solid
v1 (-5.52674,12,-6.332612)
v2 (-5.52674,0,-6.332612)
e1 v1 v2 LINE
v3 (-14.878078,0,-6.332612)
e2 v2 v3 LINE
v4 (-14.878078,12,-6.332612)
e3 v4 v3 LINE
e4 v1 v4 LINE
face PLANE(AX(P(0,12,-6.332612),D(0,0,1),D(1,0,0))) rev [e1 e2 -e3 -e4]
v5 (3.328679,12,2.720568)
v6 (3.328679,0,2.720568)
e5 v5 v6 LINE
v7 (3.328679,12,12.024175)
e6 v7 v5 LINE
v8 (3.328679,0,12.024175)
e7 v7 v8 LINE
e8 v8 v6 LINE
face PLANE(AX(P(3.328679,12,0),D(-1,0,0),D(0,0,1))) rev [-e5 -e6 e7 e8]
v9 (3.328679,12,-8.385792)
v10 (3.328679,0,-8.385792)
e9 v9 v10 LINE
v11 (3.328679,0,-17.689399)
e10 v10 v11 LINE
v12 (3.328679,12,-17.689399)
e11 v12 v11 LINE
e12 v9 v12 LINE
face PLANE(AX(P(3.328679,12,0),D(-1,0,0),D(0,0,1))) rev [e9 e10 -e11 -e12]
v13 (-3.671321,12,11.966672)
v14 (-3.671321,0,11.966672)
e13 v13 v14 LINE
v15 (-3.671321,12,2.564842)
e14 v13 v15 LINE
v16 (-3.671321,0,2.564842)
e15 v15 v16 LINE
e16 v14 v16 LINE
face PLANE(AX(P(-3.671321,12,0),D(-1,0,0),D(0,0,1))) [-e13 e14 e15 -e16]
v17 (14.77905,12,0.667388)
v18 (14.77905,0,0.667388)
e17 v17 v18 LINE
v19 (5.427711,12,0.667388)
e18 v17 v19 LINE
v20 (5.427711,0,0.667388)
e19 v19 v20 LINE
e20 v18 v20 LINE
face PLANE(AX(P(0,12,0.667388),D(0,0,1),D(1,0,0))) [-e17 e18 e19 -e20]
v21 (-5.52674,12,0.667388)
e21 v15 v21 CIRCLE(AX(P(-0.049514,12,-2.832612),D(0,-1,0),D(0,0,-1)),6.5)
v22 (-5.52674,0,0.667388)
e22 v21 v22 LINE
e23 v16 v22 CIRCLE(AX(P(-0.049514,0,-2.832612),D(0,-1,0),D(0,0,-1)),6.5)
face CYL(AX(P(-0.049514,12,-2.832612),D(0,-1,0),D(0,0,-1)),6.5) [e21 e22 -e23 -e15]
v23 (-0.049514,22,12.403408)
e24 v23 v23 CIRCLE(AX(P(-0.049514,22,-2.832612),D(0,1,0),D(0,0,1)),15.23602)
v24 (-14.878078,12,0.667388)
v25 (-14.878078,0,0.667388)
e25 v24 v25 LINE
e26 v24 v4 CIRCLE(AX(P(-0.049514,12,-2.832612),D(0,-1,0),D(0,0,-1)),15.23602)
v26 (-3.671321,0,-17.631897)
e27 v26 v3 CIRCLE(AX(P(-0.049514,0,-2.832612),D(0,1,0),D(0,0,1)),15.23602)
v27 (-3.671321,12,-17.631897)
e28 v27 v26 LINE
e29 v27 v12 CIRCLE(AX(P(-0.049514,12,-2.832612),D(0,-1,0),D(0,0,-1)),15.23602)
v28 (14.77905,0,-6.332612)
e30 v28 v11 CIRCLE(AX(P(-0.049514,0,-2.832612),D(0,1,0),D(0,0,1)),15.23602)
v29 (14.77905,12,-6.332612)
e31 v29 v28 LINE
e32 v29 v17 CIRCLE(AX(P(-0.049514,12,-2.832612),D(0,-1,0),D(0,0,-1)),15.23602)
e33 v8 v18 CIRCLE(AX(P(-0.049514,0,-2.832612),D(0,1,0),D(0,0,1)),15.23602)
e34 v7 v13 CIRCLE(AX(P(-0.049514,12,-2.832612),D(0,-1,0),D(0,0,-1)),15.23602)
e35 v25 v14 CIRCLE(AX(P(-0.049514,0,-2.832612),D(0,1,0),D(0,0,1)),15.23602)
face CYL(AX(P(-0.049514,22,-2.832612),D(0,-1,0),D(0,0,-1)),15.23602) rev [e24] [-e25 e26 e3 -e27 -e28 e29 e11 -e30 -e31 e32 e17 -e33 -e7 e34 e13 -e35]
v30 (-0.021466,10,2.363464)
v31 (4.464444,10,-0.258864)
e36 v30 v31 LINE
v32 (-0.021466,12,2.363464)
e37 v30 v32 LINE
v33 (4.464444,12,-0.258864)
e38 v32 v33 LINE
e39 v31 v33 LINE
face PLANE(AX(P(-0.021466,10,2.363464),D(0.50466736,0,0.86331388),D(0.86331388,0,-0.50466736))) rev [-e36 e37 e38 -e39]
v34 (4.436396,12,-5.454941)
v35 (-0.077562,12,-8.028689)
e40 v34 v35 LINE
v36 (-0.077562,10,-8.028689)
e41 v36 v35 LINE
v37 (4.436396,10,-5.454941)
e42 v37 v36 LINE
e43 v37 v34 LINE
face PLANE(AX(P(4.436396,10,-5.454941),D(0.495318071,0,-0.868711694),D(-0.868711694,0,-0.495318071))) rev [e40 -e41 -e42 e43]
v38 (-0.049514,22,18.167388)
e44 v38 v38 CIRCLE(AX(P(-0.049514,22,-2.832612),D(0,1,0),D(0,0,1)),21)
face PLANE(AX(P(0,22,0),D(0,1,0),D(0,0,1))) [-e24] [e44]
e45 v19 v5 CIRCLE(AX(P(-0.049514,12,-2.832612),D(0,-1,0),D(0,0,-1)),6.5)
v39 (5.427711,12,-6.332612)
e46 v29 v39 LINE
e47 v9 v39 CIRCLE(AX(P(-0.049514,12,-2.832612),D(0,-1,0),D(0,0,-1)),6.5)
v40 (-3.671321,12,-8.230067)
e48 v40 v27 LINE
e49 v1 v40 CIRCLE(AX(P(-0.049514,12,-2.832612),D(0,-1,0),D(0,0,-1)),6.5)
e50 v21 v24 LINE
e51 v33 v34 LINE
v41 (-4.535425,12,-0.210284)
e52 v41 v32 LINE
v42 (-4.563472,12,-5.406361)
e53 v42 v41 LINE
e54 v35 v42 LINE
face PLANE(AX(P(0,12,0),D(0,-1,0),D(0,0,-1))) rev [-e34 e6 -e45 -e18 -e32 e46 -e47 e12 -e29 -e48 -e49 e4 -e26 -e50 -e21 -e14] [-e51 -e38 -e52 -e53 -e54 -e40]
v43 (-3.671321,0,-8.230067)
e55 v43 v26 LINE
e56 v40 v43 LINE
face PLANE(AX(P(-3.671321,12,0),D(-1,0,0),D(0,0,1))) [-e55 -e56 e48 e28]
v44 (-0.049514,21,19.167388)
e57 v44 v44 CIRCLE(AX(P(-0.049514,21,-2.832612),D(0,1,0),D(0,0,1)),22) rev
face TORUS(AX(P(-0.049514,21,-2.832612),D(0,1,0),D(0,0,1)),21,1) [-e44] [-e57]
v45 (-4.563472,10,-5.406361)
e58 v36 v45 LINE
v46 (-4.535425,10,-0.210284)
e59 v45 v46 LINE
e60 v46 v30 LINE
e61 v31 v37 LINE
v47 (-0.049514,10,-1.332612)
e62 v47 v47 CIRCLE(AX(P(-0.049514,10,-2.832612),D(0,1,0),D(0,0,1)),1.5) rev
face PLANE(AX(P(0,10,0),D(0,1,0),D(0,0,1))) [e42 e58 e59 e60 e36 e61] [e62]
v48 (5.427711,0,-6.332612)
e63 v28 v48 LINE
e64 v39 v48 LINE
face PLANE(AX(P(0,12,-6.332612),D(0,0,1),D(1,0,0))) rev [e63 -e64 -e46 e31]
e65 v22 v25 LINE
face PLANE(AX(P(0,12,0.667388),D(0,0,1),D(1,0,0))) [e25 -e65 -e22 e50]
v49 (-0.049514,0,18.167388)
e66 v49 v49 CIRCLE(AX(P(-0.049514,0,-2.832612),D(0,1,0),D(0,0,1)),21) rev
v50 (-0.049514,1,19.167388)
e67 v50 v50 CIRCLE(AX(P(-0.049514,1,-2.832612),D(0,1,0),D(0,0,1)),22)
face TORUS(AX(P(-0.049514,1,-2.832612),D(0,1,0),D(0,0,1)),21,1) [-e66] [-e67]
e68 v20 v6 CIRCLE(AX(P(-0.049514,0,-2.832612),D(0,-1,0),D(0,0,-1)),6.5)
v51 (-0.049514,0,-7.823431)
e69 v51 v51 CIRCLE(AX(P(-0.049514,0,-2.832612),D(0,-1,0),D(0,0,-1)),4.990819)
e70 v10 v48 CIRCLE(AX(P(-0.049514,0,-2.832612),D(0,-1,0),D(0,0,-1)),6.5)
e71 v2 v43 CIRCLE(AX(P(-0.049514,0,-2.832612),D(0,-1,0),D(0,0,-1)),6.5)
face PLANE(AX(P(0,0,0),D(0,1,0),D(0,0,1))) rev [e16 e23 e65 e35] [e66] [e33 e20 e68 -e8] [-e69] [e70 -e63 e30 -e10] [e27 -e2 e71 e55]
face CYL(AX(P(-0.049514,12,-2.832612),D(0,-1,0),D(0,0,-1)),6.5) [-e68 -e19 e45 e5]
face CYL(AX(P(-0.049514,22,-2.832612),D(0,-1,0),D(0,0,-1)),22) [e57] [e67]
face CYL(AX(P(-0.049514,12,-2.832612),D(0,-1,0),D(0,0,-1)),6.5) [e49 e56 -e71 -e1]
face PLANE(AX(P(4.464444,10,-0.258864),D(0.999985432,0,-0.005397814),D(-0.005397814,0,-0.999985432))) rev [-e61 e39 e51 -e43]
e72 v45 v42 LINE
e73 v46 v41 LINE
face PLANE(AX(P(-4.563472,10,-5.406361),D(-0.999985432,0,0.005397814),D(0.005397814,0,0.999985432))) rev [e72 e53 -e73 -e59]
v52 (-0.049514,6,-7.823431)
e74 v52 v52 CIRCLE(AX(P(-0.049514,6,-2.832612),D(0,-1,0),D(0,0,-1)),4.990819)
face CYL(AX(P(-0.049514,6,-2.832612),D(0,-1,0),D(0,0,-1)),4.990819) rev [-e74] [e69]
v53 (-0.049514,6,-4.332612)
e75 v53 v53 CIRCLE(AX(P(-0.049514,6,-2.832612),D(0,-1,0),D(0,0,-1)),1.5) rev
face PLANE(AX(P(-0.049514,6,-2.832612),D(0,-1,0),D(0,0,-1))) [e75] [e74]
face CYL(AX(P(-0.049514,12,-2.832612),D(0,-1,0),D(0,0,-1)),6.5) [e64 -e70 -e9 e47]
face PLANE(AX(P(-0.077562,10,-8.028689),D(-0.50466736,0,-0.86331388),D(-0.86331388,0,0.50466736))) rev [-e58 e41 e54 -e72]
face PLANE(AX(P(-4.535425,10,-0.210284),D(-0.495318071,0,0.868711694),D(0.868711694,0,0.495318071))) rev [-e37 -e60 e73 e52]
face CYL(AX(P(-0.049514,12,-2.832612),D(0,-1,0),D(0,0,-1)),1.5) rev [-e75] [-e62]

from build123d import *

# Parameters (mm, degrees)
SKETCH1_R           = 22
BOSS_EXTRUDE2_DEPTH = 22
SKETCH3_R           = 1.5
BOSS_EXTRUDE3_DEPTH = 12
SKETCH4_R           = 4.990818698
CUT_EXTRUDE1_DEPTH  = 6
CUT_EXTRUDE2_DEPTH  = 2
FILLET1_R           = 1
FILLET2_R           = 1


with BuildPart() as part:
    # Sketch1 → Boss-Extrude2 (new body)
    with BuildSketch(Plane(origin=(0, 0, 0), x_dir=(1, 0, 0), z_dir=(0, 1, 0))):
        with Locations((-0.049514064, 2.832612422)):
            Circle(SKETCH1_R)
        with BuildLine():
            ThreePointArc((-14.878078006, 6.332612422), (-10.77871042, 13.650220944), (-3.427707319, 17.689399387))
            ThreePointArc((-3.427707319, 17.689399387), (0.075639897, 18.068118487), (3.572292681, 17.631897015))
            ThreePointArc((3.572292681, 17.631897015), (10.7681799, 13.56172263), (14.779049878, 6.332612422))
            ThreePointArc((14.779049878, 6.332612422), (15.084299184, 4.594431121), (15.186506039, 2.832612422))
            ThreePointArc((15.186506039, 2.832612422), (15.084299184, 1.070793722), (14.779049878, -0.667387578))
            ThreePointArc((14.779049878, -0.667387578), (10.7681799, -7.896497787), (3.572292681, -11.966672172))
            ThreePointArc((3.572292681, -11.966672172), (0.075639897, -12.402893644), (-3.427707319, -12.024174543))
            ThreePointArc((-3.427707319, -12.024174543), (-10.77871042, -7.984996101), (-14.878078006, -0.667387578))
            ThreePointArc((-14.878078006, -0.667387578), (-15.285534168, 2.832612422), (-14.878078006, 6.332612422))
        make_face(mode=Mode.SUBTRACT)
    extrude(amount=BOSS_EXTRUDE2_DEPTH)


with BuildPart() as boss_extrude3_tool:
    # Sketch3 → Boss-Extrude3 (new body)
    with BuildSketch(Plane(origin=(0, 0, 0), x_dir=(-1, 0, 0), z_dir=(0, -1, 0))):
        with BuildLine():
            Line((-3.328678892, 17.689399127), (-3.328678892, 8.385792362))
            ThreePointArc((-3.328678892, 8.385792362), (-4.495647669, 7.479277859), (-5.427711213, 6.332612162))
            Line((-5.427711213, 6.332612162), (-14.77904958, 6.332612162))
            ThreePointArc((-14.77904958, 6.332612162), (-15.186505741, 2.832612162), (-14.77904958, -0.667387838))
            Line((-14.77904958, -0.667387838), (-5.427711213, -0.667387838))
            ThreePointArc((-5.427711213, -0.667387838), (-4.495647669, -1.814053536), (-3.328678892, -2.720568038))
            Line((-3.328678892, -2.720568038), (-3.328678892, -12.024174803))
            ThreePointArc((-3.328678892, -12.024174803), (0.174668323, -12.402893904), (3.671321108, -11.966672432))
            Line((3.671321108, -11.966672432), (3.671321108, -2.564842414))
            ThreePointArc((3.671321108, -2.564842414), (4.696898655, -1.711815111), (5.526739937, -0.667387838))
            Line((5.526739937, -0.667387838), (14.878078304, -0.667387838))
            ThreePointArc((14.878078304, -0.667387838), (15.183327611, 1.070793462), (15.285534465, 2.832612162))
            ThreePointArc((15.285534465, 2.832612162), (15.183327611, 4.594430862), (14.878078304, 6.332612162))
            Line((14.878078304, 6.332612162), (5.526739937, 6.332612162))
            ThreePointArc((5.526739937, 6.332612162), (4.696898655, 7.377039435), (3.671321108, 8.230066738))
            Line((3.671321108, 8.230066738), (3.671321108, 17.631896755))
            ThreePointArc((3.671321108, 17.631896755), (0.174668323, 18.068118227), (-3.328678892, 17.689399127))
        make_face()
        with Locations((0.049514362, 2.832612162)):
            Circle(SKETCH3_R, mode=Mode.SUBTRACT)
    extrude(amount=-BOSS_EXTRUDE3_DEPTH)


with BuildPart() as part_1:
    add(part.part)


with BuildPart() as part_2:
    # Boss-Extrude3: joined with boss_extrude3_tool
    add(part_1.part.fuse(boss_extrude3_tool.part, tol=0.00001))

    # Sketch4 → Cut-Extrude1 (cut)
    with BuildSketch(Plane(origin=(0, 0, 0), x_dir=(-1, 0, 0), z_dir=(0, -1, 0))):
        with Locations((0.049514362, 2.832612162)):
            Circle(SKETCH4_R)
    extrude(amount=-CUT_EXTRUDE1_DEPTH, mode=Mode.SUBTRACT)

    # Sketch5 → Cut-Extrude2 (cut)
    with BuildSketch(Plane(origin=(0, 12, 0), x_dir=(1, 0, 0), z_dir=(0, 1, 0))):
        Polygon((-4.56347244, 5.406360618), (-4.535424574, 0.210283895), (-0.021466198, -2.363464302), (4.464444311, 0.258864225), (4.436396445, 5.454940948), (-0.077561931, 8.028689145), align=None)
    extrude(amount=-CUT_EXTRUDE2_DEPTH, mode=Mode.SUBTRACT)

    # Fillet1
    fillet1_edges = [part_2.edges().sort_by_distance(p)[0] for p in [
        (-22.049514064, 22, -2.832612422),
    ]]
    fillet(fillet1_edges, radius=FILLET1_R)

    # Fillet2
    fillet2_edges = [part_2.edges().sort_by_distance(p)[0] for p in [
        (-22.049514064, 0, -2.832612422),
    ]]
    fillet(fillet2_edges, radius=FILLET2_R)


solid = part_2.part
